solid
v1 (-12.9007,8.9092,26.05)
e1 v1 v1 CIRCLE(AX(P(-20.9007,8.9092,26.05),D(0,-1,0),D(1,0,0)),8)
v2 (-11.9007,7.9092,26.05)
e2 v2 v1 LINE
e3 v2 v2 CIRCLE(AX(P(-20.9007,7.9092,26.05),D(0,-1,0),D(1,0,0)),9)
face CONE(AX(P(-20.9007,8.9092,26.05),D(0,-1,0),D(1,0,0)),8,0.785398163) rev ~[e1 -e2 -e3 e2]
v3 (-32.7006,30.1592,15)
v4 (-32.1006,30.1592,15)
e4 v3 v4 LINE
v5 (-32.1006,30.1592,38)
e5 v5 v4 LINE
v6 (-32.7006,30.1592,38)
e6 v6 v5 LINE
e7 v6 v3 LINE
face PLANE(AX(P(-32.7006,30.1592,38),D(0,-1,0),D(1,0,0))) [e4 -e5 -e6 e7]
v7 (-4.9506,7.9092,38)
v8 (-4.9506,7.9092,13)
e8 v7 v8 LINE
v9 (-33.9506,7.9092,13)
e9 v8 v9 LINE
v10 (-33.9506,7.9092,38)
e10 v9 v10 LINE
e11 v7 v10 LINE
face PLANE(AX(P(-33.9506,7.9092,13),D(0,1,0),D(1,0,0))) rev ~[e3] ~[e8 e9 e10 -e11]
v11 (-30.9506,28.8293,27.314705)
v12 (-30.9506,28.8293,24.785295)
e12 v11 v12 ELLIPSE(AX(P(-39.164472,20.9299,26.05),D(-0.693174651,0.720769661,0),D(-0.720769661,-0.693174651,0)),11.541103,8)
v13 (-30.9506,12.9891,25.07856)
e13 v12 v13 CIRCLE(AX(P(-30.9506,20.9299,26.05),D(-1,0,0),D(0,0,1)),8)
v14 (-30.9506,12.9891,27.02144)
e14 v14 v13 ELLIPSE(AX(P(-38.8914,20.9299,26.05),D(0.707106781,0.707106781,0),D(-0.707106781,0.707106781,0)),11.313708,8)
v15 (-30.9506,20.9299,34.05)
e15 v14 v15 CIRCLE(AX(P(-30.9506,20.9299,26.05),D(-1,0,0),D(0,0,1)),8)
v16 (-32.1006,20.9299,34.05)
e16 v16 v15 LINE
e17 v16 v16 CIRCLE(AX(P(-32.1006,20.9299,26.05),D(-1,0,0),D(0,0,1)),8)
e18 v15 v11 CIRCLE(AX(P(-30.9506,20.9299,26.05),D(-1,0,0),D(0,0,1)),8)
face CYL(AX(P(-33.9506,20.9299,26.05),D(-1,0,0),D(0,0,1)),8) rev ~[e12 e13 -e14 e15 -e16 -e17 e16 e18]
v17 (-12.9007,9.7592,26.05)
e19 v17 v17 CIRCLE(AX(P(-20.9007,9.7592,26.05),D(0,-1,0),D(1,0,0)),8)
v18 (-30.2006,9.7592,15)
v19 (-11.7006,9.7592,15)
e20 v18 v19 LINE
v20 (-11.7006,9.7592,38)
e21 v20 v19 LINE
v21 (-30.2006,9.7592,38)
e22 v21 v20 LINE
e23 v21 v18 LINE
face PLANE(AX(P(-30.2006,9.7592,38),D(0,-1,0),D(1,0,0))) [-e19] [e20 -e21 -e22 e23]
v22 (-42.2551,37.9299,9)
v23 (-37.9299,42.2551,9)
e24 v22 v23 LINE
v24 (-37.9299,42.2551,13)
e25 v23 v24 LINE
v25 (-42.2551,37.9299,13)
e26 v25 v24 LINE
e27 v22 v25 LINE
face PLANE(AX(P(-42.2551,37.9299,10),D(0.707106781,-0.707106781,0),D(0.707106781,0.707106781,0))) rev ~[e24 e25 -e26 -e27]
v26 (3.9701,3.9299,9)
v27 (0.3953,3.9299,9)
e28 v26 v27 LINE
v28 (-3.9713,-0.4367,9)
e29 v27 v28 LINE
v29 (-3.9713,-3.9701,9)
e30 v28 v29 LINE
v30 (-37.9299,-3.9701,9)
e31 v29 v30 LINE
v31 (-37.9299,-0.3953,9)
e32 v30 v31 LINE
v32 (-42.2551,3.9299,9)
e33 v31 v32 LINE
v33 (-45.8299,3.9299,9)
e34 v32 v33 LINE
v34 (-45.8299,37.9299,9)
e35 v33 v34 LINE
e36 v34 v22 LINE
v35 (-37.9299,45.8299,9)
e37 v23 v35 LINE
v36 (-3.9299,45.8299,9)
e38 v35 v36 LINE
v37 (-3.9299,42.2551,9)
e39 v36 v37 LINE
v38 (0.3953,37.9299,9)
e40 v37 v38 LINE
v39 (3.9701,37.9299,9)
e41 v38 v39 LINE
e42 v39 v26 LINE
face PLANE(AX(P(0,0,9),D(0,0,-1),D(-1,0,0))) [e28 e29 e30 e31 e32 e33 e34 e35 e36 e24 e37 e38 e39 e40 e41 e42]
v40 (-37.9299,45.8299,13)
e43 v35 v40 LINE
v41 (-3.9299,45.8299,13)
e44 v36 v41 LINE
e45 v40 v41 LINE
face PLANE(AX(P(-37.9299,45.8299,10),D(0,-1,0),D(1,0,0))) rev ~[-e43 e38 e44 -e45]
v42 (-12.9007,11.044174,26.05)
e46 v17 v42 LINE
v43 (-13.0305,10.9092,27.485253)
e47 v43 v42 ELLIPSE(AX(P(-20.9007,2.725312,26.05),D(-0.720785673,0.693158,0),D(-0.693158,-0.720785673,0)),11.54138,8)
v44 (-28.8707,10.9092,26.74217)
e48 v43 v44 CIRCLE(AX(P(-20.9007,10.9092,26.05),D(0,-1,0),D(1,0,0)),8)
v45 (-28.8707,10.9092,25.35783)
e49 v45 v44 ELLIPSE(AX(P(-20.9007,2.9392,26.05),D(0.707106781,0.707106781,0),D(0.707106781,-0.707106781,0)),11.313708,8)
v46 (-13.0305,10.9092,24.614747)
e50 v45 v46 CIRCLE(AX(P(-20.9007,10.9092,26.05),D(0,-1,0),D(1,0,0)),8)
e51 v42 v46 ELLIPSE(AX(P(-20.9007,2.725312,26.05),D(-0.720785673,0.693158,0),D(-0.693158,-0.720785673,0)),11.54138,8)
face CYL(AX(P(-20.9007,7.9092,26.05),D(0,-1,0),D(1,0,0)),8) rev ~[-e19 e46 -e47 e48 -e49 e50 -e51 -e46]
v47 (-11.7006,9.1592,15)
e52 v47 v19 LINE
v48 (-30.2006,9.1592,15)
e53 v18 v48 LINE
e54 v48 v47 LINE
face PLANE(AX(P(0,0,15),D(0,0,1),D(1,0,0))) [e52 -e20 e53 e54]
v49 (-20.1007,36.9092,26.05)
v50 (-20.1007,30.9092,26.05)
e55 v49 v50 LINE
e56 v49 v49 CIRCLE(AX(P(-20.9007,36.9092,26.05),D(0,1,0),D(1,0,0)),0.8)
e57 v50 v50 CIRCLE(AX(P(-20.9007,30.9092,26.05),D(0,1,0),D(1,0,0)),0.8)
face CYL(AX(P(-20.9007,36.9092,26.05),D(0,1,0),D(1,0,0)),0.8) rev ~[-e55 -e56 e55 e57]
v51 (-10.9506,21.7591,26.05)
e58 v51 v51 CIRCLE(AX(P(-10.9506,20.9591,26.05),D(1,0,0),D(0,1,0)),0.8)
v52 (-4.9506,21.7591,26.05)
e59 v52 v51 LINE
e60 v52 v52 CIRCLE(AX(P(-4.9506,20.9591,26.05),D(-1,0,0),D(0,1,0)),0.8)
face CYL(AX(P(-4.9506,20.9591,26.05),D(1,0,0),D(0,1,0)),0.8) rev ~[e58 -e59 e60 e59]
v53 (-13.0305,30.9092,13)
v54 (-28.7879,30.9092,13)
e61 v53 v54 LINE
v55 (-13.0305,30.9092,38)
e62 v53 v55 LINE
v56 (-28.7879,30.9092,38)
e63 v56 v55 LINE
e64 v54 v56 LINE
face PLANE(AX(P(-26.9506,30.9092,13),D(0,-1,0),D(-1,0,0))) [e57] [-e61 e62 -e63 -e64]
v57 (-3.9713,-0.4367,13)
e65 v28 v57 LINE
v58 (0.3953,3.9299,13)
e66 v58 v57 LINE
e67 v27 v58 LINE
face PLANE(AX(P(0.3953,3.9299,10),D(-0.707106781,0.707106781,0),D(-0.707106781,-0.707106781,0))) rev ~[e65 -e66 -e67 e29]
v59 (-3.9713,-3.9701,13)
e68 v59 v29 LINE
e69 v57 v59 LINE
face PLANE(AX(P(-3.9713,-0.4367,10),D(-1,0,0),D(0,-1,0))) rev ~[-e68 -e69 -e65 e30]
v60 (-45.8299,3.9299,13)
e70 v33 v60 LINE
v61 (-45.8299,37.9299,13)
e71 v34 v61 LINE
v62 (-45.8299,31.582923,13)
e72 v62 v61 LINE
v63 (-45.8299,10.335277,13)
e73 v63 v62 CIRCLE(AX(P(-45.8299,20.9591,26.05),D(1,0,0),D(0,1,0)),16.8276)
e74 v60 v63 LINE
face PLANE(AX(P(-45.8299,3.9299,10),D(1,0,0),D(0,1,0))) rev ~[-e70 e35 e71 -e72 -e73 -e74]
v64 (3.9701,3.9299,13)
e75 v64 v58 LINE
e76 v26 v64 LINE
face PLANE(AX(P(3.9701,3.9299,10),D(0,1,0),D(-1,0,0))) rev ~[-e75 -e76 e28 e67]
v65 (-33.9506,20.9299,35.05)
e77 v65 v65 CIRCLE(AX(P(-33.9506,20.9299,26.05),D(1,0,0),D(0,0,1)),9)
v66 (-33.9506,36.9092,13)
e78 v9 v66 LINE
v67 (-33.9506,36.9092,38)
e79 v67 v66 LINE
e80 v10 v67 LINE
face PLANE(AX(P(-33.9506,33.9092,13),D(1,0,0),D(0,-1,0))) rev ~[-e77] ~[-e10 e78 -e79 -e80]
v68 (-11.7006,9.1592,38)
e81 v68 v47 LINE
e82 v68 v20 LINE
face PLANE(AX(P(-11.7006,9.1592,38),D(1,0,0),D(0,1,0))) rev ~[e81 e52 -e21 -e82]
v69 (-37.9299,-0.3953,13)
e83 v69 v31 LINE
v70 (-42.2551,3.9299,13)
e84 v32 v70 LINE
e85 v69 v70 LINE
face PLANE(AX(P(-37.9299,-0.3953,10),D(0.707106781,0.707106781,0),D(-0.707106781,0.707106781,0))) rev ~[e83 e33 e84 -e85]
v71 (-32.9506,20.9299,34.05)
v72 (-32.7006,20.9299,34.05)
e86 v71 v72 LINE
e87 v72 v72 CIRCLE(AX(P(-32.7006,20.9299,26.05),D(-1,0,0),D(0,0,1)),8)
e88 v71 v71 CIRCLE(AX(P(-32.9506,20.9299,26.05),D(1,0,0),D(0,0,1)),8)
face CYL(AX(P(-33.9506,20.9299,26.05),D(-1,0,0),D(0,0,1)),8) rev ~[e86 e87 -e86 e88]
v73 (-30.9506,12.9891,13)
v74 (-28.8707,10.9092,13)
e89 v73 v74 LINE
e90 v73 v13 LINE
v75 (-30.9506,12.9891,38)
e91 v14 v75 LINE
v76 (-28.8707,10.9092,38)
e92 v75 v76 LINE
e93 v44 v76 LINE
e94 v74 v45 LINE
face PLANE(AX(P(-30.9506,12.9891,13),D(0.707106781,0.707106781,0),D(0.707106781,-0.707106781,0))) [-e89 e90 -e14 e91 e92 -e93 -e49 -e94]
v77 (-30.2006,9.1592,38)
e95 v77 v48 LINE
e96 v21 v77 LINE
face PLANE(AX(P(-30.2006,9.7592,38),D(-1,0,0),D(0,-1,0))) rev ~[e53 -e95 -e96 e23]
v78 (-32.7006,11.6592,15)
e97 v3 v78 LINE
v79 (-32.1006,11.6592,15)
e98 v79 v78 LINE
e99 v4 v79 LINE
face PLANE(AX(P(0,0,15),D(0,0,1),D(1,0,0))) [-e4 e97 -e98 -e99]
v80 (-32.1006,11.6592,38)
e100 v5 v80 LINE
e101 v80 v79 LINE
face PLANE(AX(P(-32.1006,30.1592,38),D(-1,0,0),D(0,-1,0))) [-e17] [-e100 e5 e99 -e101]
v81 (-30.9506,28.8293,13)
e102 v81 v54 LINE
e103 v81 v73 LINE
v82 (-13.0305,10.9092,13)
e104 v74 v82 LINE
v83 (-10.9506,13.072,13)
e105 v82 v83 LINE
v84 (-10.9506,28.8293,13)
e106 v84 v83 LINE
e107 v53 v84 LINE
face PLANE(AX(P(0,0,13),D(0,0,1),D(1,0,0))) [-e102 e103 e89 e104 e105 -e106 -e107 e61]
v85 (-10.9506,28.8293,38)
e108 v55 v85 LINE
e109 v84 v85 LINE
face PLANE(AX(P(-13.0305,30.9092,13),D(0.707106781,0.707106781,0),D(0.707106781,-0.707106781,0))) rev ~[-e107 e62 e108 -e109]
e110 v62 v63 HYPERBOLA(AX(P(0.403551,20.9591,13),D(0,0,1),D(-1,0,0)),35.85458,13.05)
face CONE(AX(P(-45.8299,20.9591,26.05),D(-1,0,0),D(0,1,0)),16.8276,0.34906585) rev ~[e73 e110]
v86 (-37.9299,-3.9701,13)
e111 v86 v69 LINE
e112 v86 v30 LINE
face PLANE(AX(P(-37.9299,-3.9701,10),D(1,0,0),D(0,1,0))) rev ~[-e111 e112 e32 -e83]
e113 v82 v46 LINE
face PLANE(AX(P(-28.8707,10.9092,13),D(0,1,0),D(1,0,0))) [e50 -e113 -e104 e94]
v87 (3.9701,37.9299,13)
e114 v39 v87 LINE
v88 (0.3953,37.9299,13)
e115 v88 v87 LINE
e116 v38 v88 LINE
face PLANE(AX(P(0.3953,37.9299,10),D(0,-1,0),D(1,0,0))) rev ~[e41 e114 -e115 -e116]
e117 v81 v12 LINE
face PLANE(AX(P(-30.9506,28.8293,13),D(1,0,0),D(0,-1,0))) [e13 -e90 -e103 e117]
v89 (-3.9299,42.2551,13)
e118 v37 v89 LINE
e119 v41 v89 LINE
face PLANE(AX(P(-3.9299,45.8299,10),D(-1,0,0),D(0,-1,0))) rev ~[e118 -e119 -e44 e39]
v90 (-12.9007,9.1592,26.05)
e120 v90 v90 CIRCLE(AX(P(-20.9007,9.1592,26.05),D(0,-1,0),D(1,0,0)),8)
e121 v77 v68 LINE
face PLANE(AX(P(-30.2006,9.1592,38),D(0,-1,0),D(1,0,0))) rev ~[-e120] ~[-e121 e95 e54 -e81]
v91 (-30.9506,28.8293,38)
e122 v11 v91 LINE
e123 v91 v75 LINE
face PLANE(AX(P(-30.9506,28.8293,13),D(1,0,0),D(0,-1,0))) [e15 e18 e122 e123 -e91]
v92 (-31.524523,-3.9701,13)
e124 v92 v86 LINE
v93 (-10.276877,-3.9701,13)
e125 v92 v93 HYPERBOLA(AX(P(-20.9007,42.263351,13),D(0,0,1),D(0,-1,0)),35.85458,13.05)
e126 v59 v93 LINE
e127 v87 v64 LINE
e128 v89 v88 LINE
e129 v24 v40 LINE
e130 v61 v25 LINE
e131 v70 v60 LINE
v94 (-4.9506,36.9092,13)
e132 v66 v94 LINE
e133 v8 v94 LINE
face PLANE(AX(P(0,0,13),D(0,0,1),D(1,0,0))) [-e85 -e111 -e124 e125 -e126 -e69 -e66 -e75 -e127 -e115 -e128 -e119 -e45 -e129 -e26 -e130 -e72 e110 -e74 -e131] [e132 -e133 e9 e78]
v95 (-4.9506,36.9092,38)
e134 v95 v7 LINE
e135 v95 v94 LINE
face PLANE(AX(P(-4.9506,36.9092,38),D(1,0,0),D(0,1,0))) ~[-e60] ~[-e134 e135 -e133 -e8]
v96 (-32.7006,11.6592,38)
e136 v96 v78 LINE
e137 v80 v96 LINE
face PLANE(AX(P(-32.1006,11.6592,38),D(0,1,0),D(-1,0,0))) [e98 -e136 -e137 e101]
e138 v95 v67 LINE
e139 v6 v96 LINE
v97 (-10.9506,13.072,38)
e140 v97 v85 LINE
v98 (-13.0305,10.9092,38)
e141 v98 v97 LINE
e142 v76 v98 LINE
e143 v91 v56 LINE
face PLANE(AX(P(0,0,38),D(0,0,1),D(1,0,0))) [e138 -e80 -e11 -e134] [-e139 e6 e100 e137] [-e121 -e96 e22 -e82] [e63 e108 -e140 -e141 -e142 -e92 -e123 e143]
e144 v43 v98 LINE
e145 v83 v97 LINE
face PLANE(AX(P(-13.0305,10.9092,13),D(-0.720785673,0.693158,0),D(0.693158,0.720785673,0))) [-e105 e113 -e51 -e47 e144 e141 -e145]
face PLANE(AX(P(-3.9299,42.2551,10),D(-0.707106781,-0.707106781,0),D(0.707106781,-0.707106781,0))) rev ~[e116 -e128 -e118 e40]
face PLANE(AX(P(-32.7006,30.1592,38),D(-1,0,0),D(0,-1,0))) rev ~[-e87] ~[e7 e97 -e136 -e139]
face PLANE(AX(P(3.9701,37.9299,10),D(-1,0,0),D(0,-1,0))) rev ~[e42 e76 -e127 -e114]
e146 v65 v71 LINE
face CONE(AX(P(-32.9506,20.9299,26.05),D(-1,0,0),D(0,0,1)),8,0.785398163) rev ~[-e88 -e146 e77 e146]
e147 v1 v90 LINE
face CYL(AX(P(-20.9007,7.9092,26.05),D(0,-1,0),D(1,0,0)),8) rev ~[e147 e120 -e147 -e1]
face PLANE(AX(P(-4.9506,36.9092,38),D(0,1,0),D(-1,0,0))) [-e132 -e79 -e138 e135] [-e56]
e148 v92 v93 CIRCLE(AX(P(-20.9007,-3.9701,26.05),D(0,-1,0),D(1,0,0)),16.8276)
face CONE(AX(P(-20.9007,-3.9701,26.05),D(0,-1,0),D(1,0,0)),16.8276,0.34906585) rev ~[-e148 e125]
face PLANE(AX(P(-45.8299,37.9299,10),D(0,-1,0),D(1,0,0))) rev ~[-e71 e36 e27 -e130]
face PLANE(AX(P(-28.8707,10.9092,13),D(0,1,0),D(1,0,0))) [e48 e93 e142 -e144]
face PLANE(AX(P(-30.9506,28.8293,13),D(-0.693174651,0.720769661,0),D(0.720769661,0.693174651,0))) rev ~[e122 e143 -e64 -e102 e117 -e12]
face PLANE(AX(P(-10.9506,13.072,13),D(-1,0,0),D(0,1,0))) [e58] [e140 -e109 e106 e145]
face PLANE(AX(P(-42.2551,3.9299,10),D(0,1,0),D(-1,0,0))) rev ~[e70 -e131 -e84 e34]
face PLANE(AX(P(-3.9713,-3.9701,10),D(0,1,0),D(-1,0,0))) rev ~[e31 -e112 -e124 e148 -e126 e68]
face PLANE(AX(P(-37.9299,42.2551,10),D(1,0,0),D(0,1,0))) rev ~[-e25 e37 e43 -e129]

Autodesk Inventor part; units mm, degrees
ref_plane "YZ Plane" through (0, 0, 0) normal (1, 0, 0) x (0, 1, 0)
ref_plane "XZ Plane" through (0, 0, 0) normal (0, 1, 0) x (-1, 0, 0)
ref_plane "Work Plane1" through (0, 0, 10) normal (0, 0, 1) x (1, 0, 0)
sketch "Sketch1" plane through (0, 0, 10) normal (0, 0, 1) x (1, 0, 0)
  line L0 (-4.0299, -0.3538) -> (-2.2322, 1.4439) construction
  arc A0 (-1.4439, 2.2322) -> (-2.2322, 1.4439) centre (-0.9299, 0.9299) ccw construction
  line L1 (-1.4439, 2.2322) -> (0.3538, 4.0299) construction
  line L2 (-37.8299, 42.8299) -> (-37.8299, 37.8299) construction
  line L3 (-37.8299, 37.8299) -> (-42.9208, 37.8299) construction
  line L4 (-37.8299, 42.2137) -> (-37.8299, 45.8299) construction
  line L5 (-37.8299, 45.8299) -> (-4.0299, 45.8299) construction
  line L6 (-4.0299, 45.8299) -> (-4.0299, 42.2137) construction
  line L7 (-4.0299, 4.0299) -> (0.3538, 4.0299) projected
  circle A1 centre (-20.9299, 20.9299) radius 17.5 projected
  line L8 (-20.9299, 58.9723) -> (17.1124, 20.9299) construction
  line L9 (17.1124, 20.9299) -> (-20.9299, -17.1124) construction
  line L10 (-20.9299, -17.1124) -> (-58.9723, 20.9299) construction
  line L11 (-58.9723, 20.9299) -> (-20.9299, 58.9723) construction
  line L12 (-20.9299, 58.9723) -> (-20.9299, -17.1124) construction
  line L13 (17.1124, 20.9299) -> (-58.9723, 20.9299) construction
  line L14 (-20.9299, 58.9723) -> (32.8701, 58.9723) construction
  line L15 (-43.4299, 43.4299) -> (1.5701, 43.4299) construction
  line L16 (1.5701, 43.4299) -> (1.5701, -1.5701) construction
  line L17 (1.5701, -1.5701) -> (-43.4299, -1.5701) construction
  line L18 (-43.4299, -1.5701) -> (-43.4299, 43.4299) construction
  line L19 (-43.4299, 43.4299) -> (1.5701, -1.5701) construction
  line L20 (1.5701, 43.4299) -> (-43.4299, -1.5701) construction
  line L21 (-43.4299, 5.3876) -> (-43.4299, 36.4723)
  line L22 (-43.4299, 36.4723) -> (-36.4723, 43.4299)
  line L23 (-36.4723, 43.4299) -> (-5.3876, 43.4299)
  line L24 (-5.3876, 43.4299) -> (1.5701, 36.4723)
  line L25 (1.5701, 36.4723) -> (1.5701, 5.3876)
  line L26 (1.5701, 5.3876) -> (-5.3876, -1.5701)
  line L27 (-5.3876, -1.5701) -> (-36.4723, -1.5701)
  line L28 (-36.4723, -1.5701) -> (-43.4299, 5.3876)
  line L29 (-4.0299, 42.2137) -> (-37.8299, 42.2137) projected
  line L30 (-4.0299, -0.3538) -> (-4.0299, 4.0299) projected
  circle A2 centre (-20.9299, 20.9299) radius 1.5
  line L31 (-10.9299, 10.9299) -> (-30.9299, 10.9299) construction
  line L32 (-30.9299, 10.9299) -> (-30.9299, 30.9299) construction
  line L33 (-30.9299, 30.9299) -> (-10.9299, 30.9299) construction
  line L34 (-10.9299, 30.9299) -> (-10.9299, 10.9299) construction
  line L35 (-10.9299, 10.9299) -> (-30.9299, 30.9299) construction
  line L36 (-30.9299, 10.9299) -> (-10.9299, 30.9299) construction
  circle A3 centre (-30.9299, 30.9299) radius 1.4
  circle A4 centre (-30.9299, 10.9299) radius 1.4
  circle A5 centre (-10.9299, 10.9299) radius 1.4
  line L37 (-45.8299, 37.8299) -> (-42.0723, 37.8299) construction
  line L38 (-42.1723, 37.7299) -> (-45.8299, 37.7299)
  line L39 (-45.8299, 37.7299) -> (-45.8299, 4.1299)
  line L40 (-45.8299, 4.1299) -> (-42.1723, 4.1299)
  line L41 (-42.1723, 4.1299) -> (-42.1723, 37.7299)
  line L42 (-45.8299, 4.0299) -> (-42.0723, 4.0299) construction
  line L43 (-45.8299, 37.8299) -> (-42.0723, 37.8299) projected
  line L44 (-37.7299, 45.8299) -> (-4.1299, 45.8299)
  line L45 (-4.1299, 45.8299) -> (-4.1299, 42.1723)
  line L46 (-4.1299, 42.1723) -> (-37.7299, 42.1723)
  line L47 (-37.7299, 42.1723) -> (-37.7299, 45.8299)
  line L48 (0.4701, 37.8299) -> (0.4701, 4.0299) construction
  line L49 (0.4701, 4.0299) -> (3.9701, 4.0299) construction
  line L50 (3.9701, 37.8299) -> (3.9701, 4.0299) construction
  line L51 (0.4701, 37.8299) -> (3.9701, 37.8299) construction
  line L52 (-45.8299, -3.9701) -> (-4.0299, -3.9701) construction
  line L53 (0.3124, 37.7299) -> (3.9701, 37.7299)
  line L54 (3.9701, 37.7299) -> (3.9701, 4.1299)
  line L55 (3.9701, 4.1299) -> (0.3124, 4.1299)
  line L56 (0.3124, 4.1299) -> (0.3124, 37.7299)
  line L57 (-4.1713, -0.3538) -> (-37.7299, -0.3538)
  line L58 (-37.7299, -0.3538) -> (-37.7299, -3.9701)
  line L59 (-37.7299, -3.9701) -> (-4.1713, -3.9701)
  line L60 (-4.1713, -3.9701) -> (-4.1713, -0.3538)
  point P0 (-37.8299, 4.0299)
  dimension "d18" = 53.8
  dimension "d19" = 45
  dimension "d20" = 53.8
  dimension "d21" = 45
  dimension "d22" = 45
  dimension "d30" = 20
  dimension "d31" = 20
  dimension "d32" = 2.8
  dimension "d33" = 2.8
  dimension "d34" = 2.8
  dimension "d35" = 3
  dimension "d36" = 0.1
  dimension "d37" = 0.1
  dimension "d38" = 0.1
  dimension "d39" = 0.1
extrude "Extrusion1" add sketch "Sketch1" along normal blind 3 contours L30 L26 L57 L28 L41 L22 L46 L24 L56 L7 | L7 L26 L30 | L56 L24 L25 L26 | L26 L25 L24 L53 L54 L55 | L60 L59 L58 L57 L28 L27 L26 | L26 L27 L28 L57 | L46 L22 L29 L24 | L24 L29 L45 | L40 L39 L38 L22 L21 L28 | L28 L21 L22 L41 | L29 L22 L23 L24 | L24 L23 L22 L29 L47 L44 L45 | L47 L29 L22 | A1 | A2 | A3 | A4 | A5
sketch "Skizze4" plane through (0, 0, 13) normal (0, 0, 1) x (1, 0, 0)
  line L0 (-37.7299, 42.1723) -> (-42.1723, 37.7299) projected
  line L1 (-42.1723, 37.7299) -> (-45.8299, 37.7299) projected
  line L2 (-45.8299, 37.7299) -> (-45.8299, 4.1299) construction
  line L3 (-45.8299, 4.1299) -> (-42.1723, 4.1299) projected
  line L4 (-42.1723, 4.1299) -> (-37.6885, -0.3538) projected
  line L5 (-37.6885, -0.3538) -> (-37.7299, -0.3538) projected
  line L6 (-37.7299, -0.3538) -> (-37.7299, -3.9701) projected
  line L7 (-37.7299, -3.9701) -> (-4.1713, -3.9701) construction
  line L8 (-4.1713, -3.9701) -> (-4.1713, -0.3538) projected
  line L9 (-4.1713, -0.3538) -> (0.3124, 4.1299) projected
  line L10 (0.3124, 4.1299) -> (3.9701, 4.1299) projected
  line L11 (3.9701, 4.1299) -> (3.9701, 37.7299) construction
  line L12 (3.9701, 37.7299) -> (0.3124, 37.7299) projected
  line L13 (0.3124, 37.7299) -> (-4.1299, 42.1723) projected
  line L14 (-4.1299, 42.1723) -> (-4.1299, 45.8299) projected
  line L15 (-4.1299, 45.8299) -> (-37.7299, 45.8299) construction
  line L16 (-37.7299, 45.8299) -> (-37.7299, 42.1723) projected
  line L17 (-37.9299, 46.0299) -> (-3.9299, 46.0299) construction
  line L18 (-3.9299, 46.0299) -> (-3.9299, 42.2551)
  line L19 (-3.9299, 42.2551) -> (0.3953, 37.9299)
  line L20 (0.3953, 37.9299) -> (4.1701, 37.9299)
  line L21 (4.1701, 37.9299) -> (4.1701, 3.9299) construction
  line L22 (4.1701, 3.9299) -> (0.3953, 3.9299)
  line L23 (0.3953, 3.9299) -> (-3.9713, -0.4367)
  line L24 (-3.9713, -0.4367) -> (-3.9713, -4.1701)
  line L25 (-3.9713, -4.1701) -> (-37.9299, -4.1701) construction
  line L26 (-37.9299, -4.1701) -> (-37.9299, -0.3953)
  line L27 (-37.9299, -0.3953) -> (-42.2551, 3.9299)
  line L28 (-42.2551, 3.9299) -> (-46.0299, 3.9299)
  line L29 (-46.0299, 3.9299) -> (-46.0299, 37.9299) construction
  line L30 (-46.0299, 37.9299) -> (-42.2551, 37.9299)
  line L31 (-42.2551, 37.9299) -> (-37.9299, 42.2551)
  line L32 (-37.9299, 42.2551) -> (-37.9299, 46.0299)
  line L33 (-45.8299, 37.7299) -> (-45.8299, 37.9299)
  line L34 (-4.1299, 45.8299) -> (-37.7299, 45.8299) projected
  line L35 (-37.7299, 45.8299) -> (-37.9299, 45.8299)
  line L36 (-4.1299, 45.8299) -> (-3.9299, 45.8299)
  line L37 (3.9701, 37.7299) -> (3.9701, 37.9299)
  line L38 (3.9701, 4.1299) -> (3.9701, 37.7299) projected
  line L39 (3.9701, 4.1299) -> (3.9701, 3.9299)
  line L40 (-4.1713, -3.9701) -> (-3.9713, -3.9701)
  line L41 (-37.7299, -3.9701) -> (-37.9299, -3.9701)
  line L42 (-45.8299, 4.1299) -> (-45.8299, 3.9299)
  point P0 (0, 0)
  dimension "d40" = 0.2
extrude "IM_offset" add sketch "Skizze4" against normal up to surface (3 mm away)
ref_plane "Arbeitsebene5" through (-20.9299, 3.9299, 10) normal (1, 0, 0) x (0, 0, -1)
ref_plane "Arbeitsebene6" through (-37.9299, 20.9299, 10) normal (0, 1, 0) x (1, 0, 0)
sketch "Skizze25" plane through (0, 0, 13) normal (0, 0, 1) x (1, 0, 0)
  line L0 (3.9701, 3.9299) -> (3.9701, 37.9299) projected
  line L1 (3.9701, 37.9299) -> (0.3953, 37.9299) projected
  line L2 (0.3953, 37.9299) -> (-3.9299, 42.2551) projected
  line L3 (-3.9299, 42.2551) -> (-3.9299, 45.8299) projected
  line L4 (-3.9299, 45.8299) -> (-37.9299, 45.8299) projected
  line L5 (-37.9299, 45.8299) -> (-37.9299, 42.2551) projected
  line L6 (-37.9299, 42.2551) -> (-42.2551, 37.9299) projected
  line L7 (-42.2551, 37.9299) -> (-45.8299, 37.9299) projected
  line L8 (-45.8299, 37.9299) -> (-45.8299, 3.9299) projected
  line L9 (-42.2551, 3.9299) -> (-45.8299, 3.9299) projected
  line L10 (-37.9299, -0.3953) -> (-42.2551, 3.9299) projected
  line L11 (-37.9299, -3.9701) -> (-37.9299, -0.3953) projected
  line L12 (-3.9713, -3.9701) -> (-37.9299, -3.9701) projected
  line L13 (-3.9713, -3.9701) -> (-3.9713, -0.4367) projected
  line L14 (-3.9713, -0.4367) -> (0.3953, 3.9299) projected
  line L15 (0.3953, 3.9299) -> (3.9701, 3.9299) projected
  line L16 (-9.2627, 11.384) -> (-30.4759, 32.5972)
  line L17 (-11.384, 9.2627) -> (-32.5972, 30.4759)
  line L18 (-10.9506, 30.9092) -> (-30.9506, 30.9092)
  line L19 (-30.9506, 30.9092) -> (-30.9506, 10.9092)
  line L20 (-30.9506, 10.9092) -> (-10.9506, 10.9092)
  line L21 (-10.9506, 10.9092) -> (-10.9506, 30.9092)
  line L22 (-10.9506, 30.9092) -> (-30.9506, 10.9092) construction
  line L23 (-30.9506, 30.9092) -> (-10.9506, 10.9092) construction
  line L24 (-7.9506, 33.9092) -> (-33.9506, 33.9092)
  line L25 (-33.9506, 33.9092) -> (-33.9506, 7.9092)
  line L26 (-33.9506, 7.9092) -> (-7.9506, 7.9092)
  line L27 (-7.9506, 7.9092) -> (-7.9506, 33.9092)
  line L28 (-10.9506, 14.9092) -> (-7.9506, 14.9092)
  line L29 (-26.9506, 30.9092) -> (-26.9506, 33.9092)
  line L30 (-13.0305, 10.9092) -> (-10.9506, 13.072)
  line L31 (-30.9506, 28.8293) -> (-28.7879, 30.9092)
  line L32 (-13.0305, 30.9092) -> (-10.9506, 28.8293)
  line L33 (-30.9506, 12.9891) -> (-28.8707, 10.9092)
  point P0 (0, 0)
  point P1 (-20.9506, 20.9092)
  dimension "d150" = 20
  dimension "d151" = 20
  dimension "d152" = 3
  dimension "d153" = 7
  dimension "d154" = 7
extrude "Extrusion21" add sketch "Skizze25" along normal blind 25 contours L21 L28 L27 L26 L25 L24 L29 L18 L19 L20 | L21 L20 L30 | L31 L19 L18 | L21 L18 L29 L24 L27 L28 | L32 L18 L21 | L20 L19 L33
ref_plane "Arbeitsebene9" through (0, 0, 42) normal (0, 0, 1) x (1, 0, 0)
sketch "Skizze27" plane through (0, 0, 38) normal (0, 0, 1) x (1, 0, 0)
  line L0 (-26.9506, 32.6592) -> (-32.7006, 32.6592)
  line L1 (-32.7006, 32.6592) -> (-32.7006, 9.1592)
  line L2 (-32.7006, 9.1592) -> (-9.2006, 9.1592)
  line L3 (-9.2006, 9.1592) -> (-9.2006, 14.9092)
  arc A0 (-9.2006, 14.9092) -> (-26.9506, 32.6592) centre (-26.9506, 14.9092) ccw
  line L4 (-26.9506, 32.0592) -> (-32.1006, 32.0592)
  line L5 (-32.1006, 32.0592) -> (-32.1006, 9.7592)
  line L6 (-32.1006, 9.7592) -> (-9.8006, 9.7592)
  line L7 (-9.8006, 9.7592) -> (-9.8006, 14.9092)
  arc A1 (-9.8006, 14.9092) -> (-26.9506, 32.0592) centre (-26.9506, 14.9092) ccw
  line L8 (-9.2006, 13.072) -> (-9.8006, 13.072)
  line L9 (-28.7879, 32.0592) -> (-28.7879, 32.6592)
  line L10 (-30.2006, 9.1592) -> (-11.7006, 9.1592)
  line L11 (-11.7006, 9.1592) -> (-11.7006, 9.7592)
  line L12 (-11.7006, 9.7592) -> (-30.2006, 9.7592)
  line L13 (-30.2006, 9.7592) -> (-30.2006, 9.1592)
  line L14 (-30.2006, 9.1592) -> (-11.7006, 9.7592) construction
  line L15 (-11.7006, 9.1592) -> (-30.2006, 9.7592) construction
  line L16 (-32.7006, 30.1592) -> (-32.1006, 30.1592)
  line L17 (-32.1006, 30.1592) -> (-32.1006, 11.6592)
  line L18 (-32.1006, 11.6592) -> (-32.7006, 11.6592)
  line L19 (-32.7006, 11.6592) -> (-32.7006, 30.1592)
  line L20 (-32.7006, 30.1592) -> (-32.1006, 11.6592) construction
  line L21 (-32.1006, 30.1592) -> (-32.7006, 11.6592) construction
  point P0 (0, 0)
  point P1 (-20.9506, 9.4592)
  point P2 (-20.9506, 9.1592)
  point P3 (-32.4006, 20.9092)
  point P4 (-32.7006, 20.9092)
  point P5 (-28.7879, 30.9092)
  point P6 (-10.9506, 13.072)
  dimension "d159" = 0.6
  dimension "d163" = 18.5
  dimension "d164" = 18.5
  dimension "d173" = 0
  dimension "d174" = 0
extrude "Extrusion23" cut sketch "Skizze27" against normal blind 23 contours L16 L5 L18 L1 | L2 L13 L6 L11
sketch "Skizze28" plane through (-33.9506, 7.9092, 13) normal (-1, 0, 0) x (0, 0, 1)
  line L0 (51.2, 13.0207) -> (-25.1, 13.0207)
  circle A0 centre (13.05, 13.0207) radius 8
  point P0 (-13, -7.9092)
  dimension "d165" = 16
extrude "Extrusion24" cut sketch "Skizze28" against normal blind 4
sketch "Skizze29" plane through (-33.9506, 7.9092, 13) normal (0, -1, 0) x (1, 0, 0)
  line L0 (0, 5.05) -> (0, 21.05) projected
  circle A0 centre (13.0499, 13.05) radius 8
  point P0 (33.9506, -13)
  dimension "d168" = 16
extrude "Extrusion25" cut sketch "Skizze29" against normal blind 4
ref_plane "Arbeitsebene7" through (-20.9299, 20.9299, 26.13) normal (-0.7071068, 0.7071068, 0) x (0.7071068, 0.7071068, 0)
ref_plane "Arbeitsebene8" through (-30.8674, 33.0715, 13) normal (0.6931675, -0.7207765, 0) x (0.7207765, 0.6931675, 0)
sketch "Skizze32" plane through (0, 0, 10) normal (0, 0, -1) x (-1, 0, 0)
  line L0 (3.9713, -3.9701) -> (37.9299, -3.9701) projected
  line L1 (37.9299, -3.9701) -> (37.9299, -0.3953) projected
  line L2 (37.9299, -0.3953) -> (42.2551, 3.9299) projected
  line L3 (42.2551, 3.9299) -> (45.8299, 3.9299) projected
  line L4 (45.8299, 3.9299) -> (45.8299, 37.9299) projected
  line L5 (45.8299, 37.9299) -> (42.2551, 37.9299) projected
  line L6 (42.2551, 37.9299) -> (37.9299, 42.2551) projected
  line L7 (37.9299, 42.2551) -> (37.9299, 45.8299) projected
  line L8 (37.9299, 45.8299) -> (3.9299, 45.8299) projected
  line L9 (3.9299, 45.8299) -> (3.9299, 42.2551) projected
  line L10 (3.9299, 42.2551) -> (-0.3953, 37.9299) projected
  line L11 (-0.3953, 37.9299) -> (-3.9701, 37.9299) projected
  line L12 (-3.9701, 37.9299) -> (-3.9701, 3.9299) projected
  line L13 (-3.9701, 3.9299) -> (-0.3953, 3.9299) projected
  line L14 (-0.3953, 3.9299) -> (3.9713, -0.4367) projected
  line L15 (3.9713, -0.4367) -> (3.9713, -3.9701) projected
  point P0 (0, 0)
extrude "Extrusion28" add sketch "Skizze32" along normal blind 1
sketch "Skizze33" plane through (-37.9299, -3.9701, 13) normal (0, -1, 0) x (1, 0, 0)
  circle A0 centre (17.0292, 13.05) radius 8 projected
  circle A1 centre (17.0292, 13.05) radius 16.8276
  point P0 (37.9299, -13)
extrude "Extrusion29" cut sketch "Skizze33" against normal blind 11.879 draft -20 contours A0 | A1
sketch "Skizze34" plane through (0, 0, 38) normal (0, 0, 1) x (1, 0, 0)
  line L0 (-11.7006, 9.7592) -> (-11.7006, 9.1592) projected
  line L1 (-11.7006, 9.1592) -> (-30.2006, 9.1592) projected
  line L2 (-30.2006, 9.1592) -> (-30.2006, 9.7592) projected
  line L3 (-30.2006, 9.7592) -> (-11.7006, 9.7592) projected
  line L4 (-32.7006, 30.1592) -> (-32.1006, 30.1592) projected
  line L5 (-32.1006, 30.1592) -> (-32.1006, 11.6592) projected
  line L6 (-32.1006, 11.6592) -> (-32.7006, 11.6592) projected
  line L7 (-32.7006, 11.6592) -> (-32.7006, 30.1592) projected
  line L8 (-7.9506, 7.9092) -> (-7.9506, 33.9092) projected
  line L9 (-7.9506, 33.9092) -> (-33.9506, 33.9092) projected
  line L10 (-33.9506, 33.9092) -> (-33.9506, 7.9092) projected
  line L11 (-33.9506, 7.9092) -> (-7.9506, 7.9092) projected
  line L12 (-10.9506, 28.8293) -> (-10.9506, 13.072) projected
  line L13 (-10.9506, 13.072) -> (-13.0305, 10.9092) projected
  line L14 (-13.0305, 10.9092) -> (-28.8707, 10.9092) projected
  line L15 (-28.8707, 10.9092) -> (-30.9506, 12.9891) projected
  line L16 (-30.9506, 12.9891) -> (-30.9506, 28.8293) projected
  line L17 (-30.9506, 28.8293) -> (-28.7879, 30.9092) projected
  line L18 (-28.7879, 30.9092) -> (-13.0305, 30.9092) projected
  line L19 (-13.0305, 30.9092) -> (-10.9506, 28.8293) projected
  line L20 (-33.9506, 33.9092) -> (-7.9506, 33.9092) projected
  line L21 (-33.9506, 33.9092) -> (-7.9506, 33.9092)
  line L22 (-7.9506, 33.9092) -> (-7.9506, 36.9092)
  line L23 (-7.9506, 36.9092) -> (-33.9506, 36.9092)
  line L24 (-33.9506, 36.9092) -> (-33.9506, 33.9092)
  line L25 (-7.9506, 33.9092) -> (-7.9506, 7.9092) projected
  line L26 (-7.9506, 33.9092) -> (-4.9506, 36.9092)
  line L27 (-4.9506, 36.9092) -> (-7.9506, 36.9092)
  point P0 (0, 0)
  dimension "d183" = 3
extrude "Extrusion30" add sketch "Skizze34" against normal up to surface (25 mm away) contours L9 L24 L23 L22 | L22 L27 L26
sketch "Skizze35" plane through (-33.9506, 36.9092, 38) normal (0, 1, 0) x (1, 0, 0)
  line L0 (0, 25) -> (29, 25) projected
  line L1 (0, 0) -> (0, 25) projected
  line L2 (29, 0) -> (0, 0) projected
  line L3 (29, 0) -> (29, 25) projected
  arc A0 (20.9201, 13.3854) -> (5.0799, 12.6417) centre (13.0499, 11.95) ccw projected
  circle A1 centre (13.0499, 11.95) radius 0.8
  point P0 (33.9506, 38)
  dimension "d186" = 1.6
extrude "Extrusion31" cut sketch "Skizze35" against normal blind 10 contours A1
mirror "Spiegeln3" about plane through (-20.9299, 20.9299, 26.13) normal (-0.7071068, 0.7071068, 0) of "Extrusion29", "Extrusion30", "Extrusion31"
chamfer "Fase2" distance 1 angle 45 2 edges at (-28.9007, 7.9092, 26.05) (-33.9506, 20.9299, 18.05)
properties part number "20_Cube_Insert_Lightsheet_FEPTube_Pipette_v3"
